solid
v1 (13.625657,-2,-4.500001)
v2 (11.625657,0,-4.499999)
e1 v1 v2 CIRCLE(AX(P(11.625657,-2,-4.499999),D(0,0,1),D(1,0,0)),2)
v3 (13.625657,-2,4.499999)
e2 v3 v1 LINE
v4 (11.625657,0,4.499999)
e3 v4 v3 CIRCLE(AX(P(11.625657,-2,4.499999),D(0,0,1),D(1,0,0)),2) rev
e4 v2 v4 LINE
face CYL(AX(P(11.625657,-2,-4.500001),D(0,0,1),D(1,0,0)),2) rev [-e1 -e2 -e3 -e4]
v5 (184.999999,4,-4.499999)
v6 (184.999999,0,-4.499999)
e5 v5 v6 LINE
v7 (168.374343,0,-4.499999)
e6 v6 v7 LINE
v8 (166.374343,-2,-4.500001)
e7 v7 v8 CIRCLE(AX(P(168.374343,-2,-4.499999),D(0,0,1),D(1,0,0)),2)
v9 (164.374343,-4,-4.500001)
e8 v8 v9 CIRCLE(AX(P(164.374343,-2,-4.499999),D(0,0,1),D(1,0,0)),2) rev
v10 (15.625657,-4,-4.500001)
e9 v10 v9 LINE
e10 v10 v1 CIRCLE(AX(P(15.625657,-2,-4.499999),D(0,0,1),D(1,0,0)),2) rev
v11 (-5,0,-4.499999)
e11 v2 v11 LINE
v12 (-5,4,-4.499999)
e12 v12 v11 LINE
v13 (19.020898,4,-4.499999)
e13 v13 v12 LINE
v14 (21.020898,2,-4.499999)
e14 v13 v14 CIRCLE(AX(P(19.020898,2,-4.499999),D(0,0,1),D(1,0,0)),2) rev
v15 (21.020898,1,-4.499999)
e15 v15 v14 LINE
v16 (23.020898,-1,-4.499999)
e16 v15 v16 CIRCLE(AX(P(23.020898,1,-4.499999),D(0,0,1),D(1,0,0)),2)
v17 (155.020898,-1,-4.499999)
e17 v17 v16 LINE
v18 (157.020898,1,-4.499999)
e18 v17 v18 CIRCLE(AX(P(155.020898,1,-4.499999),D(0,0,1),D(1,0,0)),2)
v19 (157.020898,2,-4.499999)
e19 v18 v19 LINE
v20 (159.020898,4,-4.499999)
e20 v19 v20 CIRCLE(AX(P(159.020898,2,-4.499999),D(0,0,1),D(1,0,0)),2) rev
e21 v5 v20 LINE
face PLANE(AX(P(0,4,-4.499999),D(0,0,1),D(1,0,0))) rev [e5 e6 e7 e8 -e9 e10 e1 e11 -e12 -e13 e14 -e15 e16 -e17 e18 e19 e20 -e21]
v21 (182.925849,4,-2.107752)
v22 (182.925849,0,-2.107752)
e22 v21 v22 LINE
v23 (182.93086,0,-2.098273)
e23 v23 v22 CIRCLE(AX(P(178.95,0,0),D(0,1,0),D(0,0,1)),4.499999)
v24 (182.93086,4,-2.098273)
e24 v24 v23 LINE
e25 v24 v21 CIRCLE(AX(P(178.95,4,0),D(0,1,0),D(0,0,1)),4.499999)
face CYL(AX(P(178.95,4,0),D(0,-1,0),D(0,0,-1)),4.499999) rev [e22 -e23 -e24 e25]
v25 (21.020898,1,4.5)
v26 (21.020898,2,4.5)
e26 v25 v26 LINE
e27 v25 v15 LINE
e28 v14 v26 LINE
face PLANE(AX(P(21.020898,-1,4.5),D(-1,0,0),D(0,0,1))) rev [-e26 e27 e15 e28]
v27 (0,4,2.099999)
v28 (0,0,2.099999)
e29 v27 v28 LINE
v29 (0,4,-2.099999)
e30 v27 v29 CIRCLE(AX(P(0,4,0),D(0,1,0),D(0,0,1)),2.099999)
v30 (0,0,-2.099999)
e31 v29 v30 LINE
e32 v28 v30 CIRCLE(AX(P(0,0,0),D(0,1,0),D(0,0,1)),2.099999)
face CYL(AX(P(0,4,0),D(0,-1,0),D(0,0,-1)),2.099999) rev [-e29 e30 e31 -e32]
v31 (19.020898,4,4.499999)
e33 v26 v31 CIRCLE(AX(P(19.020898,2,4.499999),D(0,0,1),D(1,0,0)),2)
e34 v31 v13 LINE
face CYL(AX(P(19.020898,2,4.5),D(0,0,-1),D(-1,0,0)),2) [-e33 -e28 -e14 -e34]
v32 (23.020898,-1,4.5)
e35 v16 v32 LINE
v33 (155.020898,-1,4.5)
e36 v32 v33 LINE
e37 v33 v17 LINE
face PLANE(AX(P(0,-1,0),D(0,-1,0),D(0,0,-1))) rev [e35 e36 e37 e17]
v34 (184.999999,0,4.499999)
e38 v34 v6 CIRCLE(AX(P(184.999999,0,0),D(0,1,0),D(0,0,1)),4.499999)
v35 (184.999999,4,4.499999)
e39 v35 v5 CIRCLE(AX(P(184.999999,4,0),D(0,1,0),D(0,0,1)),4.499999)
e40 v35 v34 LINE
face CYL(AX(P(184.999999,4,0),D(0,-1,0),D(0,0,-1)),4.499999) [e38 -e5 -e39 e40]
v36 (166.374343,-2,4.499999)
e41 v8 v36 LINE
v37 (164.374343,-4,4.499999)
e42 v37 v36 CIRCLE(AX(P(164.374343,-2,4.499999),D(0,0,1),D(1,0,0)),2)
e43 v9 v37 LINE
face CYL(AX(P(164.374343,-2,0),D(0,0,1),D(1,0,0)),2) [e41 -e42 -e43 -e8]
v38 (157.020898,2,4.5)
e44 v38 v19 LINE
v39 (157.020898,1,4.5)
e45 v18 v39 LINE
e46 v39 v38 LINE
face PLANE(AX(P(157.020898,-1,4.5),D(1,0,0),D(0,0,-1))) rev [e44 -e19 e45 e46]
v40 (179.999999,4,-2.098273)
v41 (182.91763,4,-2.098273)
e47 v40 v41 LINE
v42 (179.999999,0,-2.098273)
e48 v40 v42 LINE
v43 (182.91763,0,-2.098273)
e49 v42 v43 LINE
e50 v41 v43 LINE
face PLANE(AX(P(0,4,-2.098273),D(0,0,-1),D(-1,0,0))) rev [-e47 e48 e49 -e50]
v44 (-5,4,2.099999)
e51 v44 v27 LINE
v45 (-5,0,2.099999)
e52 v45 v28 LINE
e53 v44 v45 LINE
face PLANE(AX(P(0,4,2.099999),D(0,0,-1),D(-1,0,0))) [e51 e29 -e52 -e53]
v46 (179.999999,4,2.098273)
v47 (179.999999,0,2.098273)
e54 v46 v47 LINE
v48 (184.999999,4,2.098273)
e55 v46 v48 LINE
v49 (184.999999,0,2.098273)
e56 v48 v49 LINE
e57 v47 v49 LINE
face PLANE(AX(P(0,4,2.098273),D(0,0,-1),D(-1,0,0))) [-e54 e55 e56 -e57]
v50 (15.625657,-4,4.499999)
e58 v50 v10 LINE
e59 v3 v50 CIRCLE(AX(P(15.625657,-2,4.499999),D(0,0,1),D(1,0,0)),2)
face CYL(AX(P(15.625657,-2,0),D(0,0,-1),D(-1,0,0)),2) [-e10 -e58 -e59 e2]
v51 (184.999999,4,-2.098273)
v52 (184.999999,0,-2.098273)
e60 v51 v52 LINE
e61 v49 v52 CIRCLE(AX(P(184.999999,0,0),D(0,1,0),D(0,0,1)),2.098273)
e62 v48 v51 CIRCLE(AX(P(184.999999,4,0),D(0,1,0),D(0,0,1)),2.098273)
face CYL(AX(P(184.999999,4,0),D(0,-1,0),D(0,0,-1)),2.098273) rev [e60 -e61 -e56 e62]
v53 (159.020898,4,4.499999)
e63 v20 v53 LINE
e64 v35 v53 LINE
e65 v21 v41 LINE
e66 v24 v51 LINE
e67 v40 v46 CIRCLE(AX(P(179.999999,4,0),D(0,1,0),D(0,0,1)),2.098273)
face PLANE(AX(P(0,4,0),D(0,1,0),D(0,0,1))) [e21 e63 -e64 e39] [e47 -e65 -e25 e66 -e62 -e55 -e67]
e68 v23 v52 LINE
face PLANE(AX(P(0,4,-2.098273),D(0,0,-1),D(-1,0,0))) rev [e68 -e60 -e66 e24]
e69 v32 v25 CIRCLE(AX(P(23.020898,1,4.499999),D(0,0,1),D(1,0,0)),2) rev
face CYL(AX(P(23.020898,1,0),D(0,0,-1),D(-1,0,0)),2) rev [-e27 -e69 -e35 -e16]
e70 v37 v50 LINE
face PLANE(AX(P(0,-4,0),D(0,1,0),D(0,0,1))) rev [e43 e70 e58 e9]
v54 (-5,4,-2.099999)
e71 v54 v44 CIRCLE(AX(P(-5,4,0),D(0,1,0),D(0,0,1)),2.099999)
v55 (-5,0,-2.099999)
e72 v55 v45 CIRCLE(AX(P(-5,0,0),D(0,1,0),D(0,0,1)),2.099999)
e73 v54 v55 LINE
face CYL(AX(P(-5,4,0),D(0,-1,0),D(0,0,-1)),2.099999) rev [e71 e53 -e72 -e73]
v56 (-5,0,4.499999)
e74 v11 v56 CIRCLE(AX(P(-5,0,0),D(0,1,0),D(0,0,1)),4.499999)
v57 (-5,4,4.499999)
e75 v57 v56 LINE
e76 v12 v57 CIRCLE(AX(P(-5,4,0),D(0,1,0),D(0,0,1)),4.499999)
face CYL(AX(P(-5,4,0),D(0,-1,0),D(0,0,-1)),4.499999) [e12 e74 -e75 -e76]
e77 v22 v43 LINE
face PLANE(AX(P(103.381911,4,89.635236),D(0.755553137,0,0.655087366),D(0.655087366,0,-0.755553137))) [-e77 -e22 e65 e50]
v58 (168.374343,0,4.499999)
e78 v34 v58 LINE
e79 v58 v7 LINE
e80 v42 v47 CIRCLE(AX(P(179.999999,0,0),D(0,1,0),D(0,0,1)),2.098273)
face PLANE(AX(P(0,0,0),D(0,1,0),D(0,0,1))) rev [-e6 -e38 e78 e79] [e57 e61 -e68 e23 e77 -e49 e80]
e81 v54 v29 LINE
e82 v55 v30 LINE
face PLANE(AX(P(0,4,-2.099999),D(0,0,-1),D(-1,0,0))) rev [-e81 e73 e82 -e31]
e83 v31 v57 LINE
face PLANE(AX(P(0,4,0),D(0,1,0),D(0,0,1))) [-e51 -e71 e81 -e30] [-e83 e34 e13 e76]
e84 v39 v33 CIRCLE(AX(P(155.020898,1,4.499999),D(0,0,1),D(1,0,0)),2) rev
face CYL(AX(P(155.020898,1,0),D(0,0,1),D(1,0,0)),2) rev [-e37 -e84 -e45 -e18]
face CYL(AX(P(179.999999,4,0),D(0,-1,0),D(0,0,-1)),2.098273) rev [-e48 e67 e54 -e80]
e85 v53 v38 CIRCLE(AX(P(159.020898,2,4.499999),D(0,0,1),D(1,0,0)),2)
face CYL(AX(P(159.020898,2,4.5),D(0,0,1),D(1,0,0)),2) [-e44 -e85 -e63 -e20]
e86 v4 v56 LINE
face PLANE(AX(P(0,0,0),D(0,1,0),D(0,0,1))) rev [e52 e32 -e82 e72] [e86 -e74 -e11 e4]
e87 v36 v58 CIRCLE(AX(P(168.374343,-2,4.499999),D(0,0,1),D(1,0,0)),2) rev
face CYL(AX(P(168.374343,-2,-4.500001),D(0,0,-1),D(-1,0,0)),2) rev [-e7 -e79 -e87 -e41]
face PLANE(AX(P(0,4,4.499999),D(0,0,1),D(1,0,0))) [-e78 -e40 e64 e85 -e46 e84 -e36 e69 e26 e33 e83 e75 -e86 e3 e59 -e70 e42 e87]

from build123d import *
from OCP.BRepAlgoAPI import BRepAlgoAPI_Cut
from OCP.TopTools import TopTools_ListOfShape

# Parameters (mm, degrees)
BOSS_EXTRUDE1_DEPTH = 4
SKETCH2_W           = 152.748685894
SKETCH2_H           = 9
BOSS_EXTRUDE2_DEPTH = 4
SKETCH4_W           = 136
SKETCH4_H           = 8.999998789
CUT_EXTRUDE1_DEPTH  = 5
FILLET1_R           = 2


with BuildPart() as part:
    # Sketch1 → Boss-Extrude1 (new body)
    with BuildSketch(Plane(origin=(0, 0, 0), x_dir=(1, 0, 0), z_dir=(0, 1, 0))):
        with BuildLine():
            Line((177.196729435, 4.499999466), (2.799999668, 4.499999466))
            Line((2.799999668, 4.499999466), (-5, 4.499999466))
            ThreePointArc((-5, 4.499999466), (-9.499999466, 0), (-5, -4.499999466))
            Line((-5, -4.499999466), (2.799999668, -4.499999466))
            Line((2.799999668, -4.499999466), (177.196729435, -4.499999466))
            Line((177.196729435, -4.499999466), (184.999999457, -4.499999466))
            ThreePointArc((184.999999457, -4.499999466), (189.499998923, 0), (184.999999457, 4.499999466))
            Line((184.999999457, 4.499999466), (177.196729435, 4.499999466))
        make_face()
        with BuildLine():
            ThreePointArc((-5, -2.099999371), (-7.099999371, 0), (-5, 2.099999371))
            Line((-5, 2.099999371), (0, 2.099999371))
            ThreePointArc((0, 2.099999371), (2.099999371, 0), (0, -2.099999371))
            Line((0, -2.099999371), (-5, -2.099999371))
        make_face(mode=Mode.SUBTRACT)
        with BuildLine():
            ThreePointArc((179.999998561, -2.09827259), (177.90172597, 0), (179.999998561, 2.09827259))
            Line((179.999998561, 2.09827259), (182.917630381, 2.09827259))
            Line((182.917630381, 2.09827259), (182.925849231, 2.107751903))
            ThreePointArc((182.925849231, 2.107751903), (182.928357501, 2.103013739), (182.930860124, 2.09827259))
            Line((182.930860124, 2.09827259), (184.999999457, 2.09827259))
            ThreePointArc((184.999999457, 2.09827259), (187.098272047, 0), (184.999999457, -2.09827259))
            Line((184.999999457, -2.09827259), (179.999998561, -2.09827259))
        make_face(mode=Mode.SUBTRACT)
    extrude(amount=BOSS_EXTRUDE1_DEPTH)

    # Sketch2 → Boss-Extrude2 (add)
    with BuildSketch(Plane.XZ):
        with Locations((90, -5.34e-07)):
            Rectangle(SKETCH2_W, SKETCH2_H)
    extrude(amount=BOSS_EXTRUDE2_DEPTH)


with BuildPart() as cut_extrude1_tool:
    # Sketch4 → Cut-Extrude1 (new body)
    with BuildSketch(Plane(origin=(0, 4, 0), x_dir=(1, 0, 0), z_dir=(0, 1, 0))):
        with Locations((89.020897584, -6.05e-07)):
            Rectangle(SKETCH4_W, SKETCH4_H)
    extrude(amount=-CUT_EXTRUDE1_DEPTH)


with BuildPart() as part_1:
    add(part.part)

    # Cut-Extrude1: cut by cut_extrude1_tool, with a tolerance
    cut_extrude1_stock = TopTools_ListOfShape()
    cut_extrude1_stock.Append(part_1.part.wrapped)
    cut_extrude1_tools = TopTools_ListOfShape()
    cut_extrude1_tools.Append(cut_extrude1_tool.part.wrapped)
    cut_extrude1_cut = BRepAlgoAPI_Cut()
    cut_extrude1_cut.SetArguments(cut_extrude1_stock)
    cut_extrude1_cut.SetTools(cut_extrude1_tools)
    cut_extrude1_cut.SetFuzzyValue(0.00001)
    cut_extrude1_cut.Build()
    add(Compound.cast(cut_extrude1_cut.Shape()).solids(), mode=Mode.REPLACE)

    # Fillet1
    # the kernel refuses this fillet: 2 mm, written as the material it adds along each edge
    with BuildSketch(Plane(origin=(157.020897584, -1, 9.5), x_dir=(0, 1, 0), z_dir=(0, 0, -1))) as fillet1_piece_1_section:
        with BuildLine():
            CenterArc((FILLET1_R, -FILLET1_R), FILLET1_R, 90, 90)
            Line((0, -FILLET1_R), (0, 0))
            Line((0, 0), (FILLET1_R, 0))
        make_face()
    fillet1_piece_1 = extrude(amount=18.999998789, mode=Mode.PRIVATE)
    fillet1_piece_1 = split(fillet1_piece_1, bisect_by=Plane(origin=(157.020897584, -1, 4.499999466), z_dir=(0, 0, -1)), keep=Keep.TOP, mode=Mode.PRIVATE)
    fillet1_piece_1 = split(fillet1_piece_1, bisect_by=Plane(origin=(157.020897584, -1, -4.500000534), z_dir=(0, 0, 1)), keep=Keep.TOP, mode=Mode.PRIVATE)
    add(fillet1_piece_1)
    with BuildSketch(Plane(origin=(21.020897584, -1, -9.499998789), x_dir=(1, 0, 0), z_dir=(0, 0, 1))) as fillet1_piece_2_section:
        with BuildLine():
            CenterArc((FILLET1_R, FILLET1_R), FILLET1_R, 180, 90)
            Line((0, FILLET1_R), (0, 0))
            Line((0, 0), (FILLET1_R, 0))
        make_face()
    fillet1_piece_2 = extrude(amount=18.999998789, mode=Mode.PRIVATE)
    fillet1_piece_2 = split(fillet1_piece_2, bisect_by=Plane(origin=(21.020897584, -1, 4.499999466), z_dir=(0, 0, -1)), keep=Keep.TOP, mode=Mode.PRIVATE)
    fillet1_piece_2 = split(fillet1_piece_2, bisect_by=Plane(origin=(21.020897584, -1, -4.500000534), z_dir=(0, 0, 1)), keep=Keep.TOP, mode=Mode.PRIVATE)
    add(fillet1_piece_2)
    with BuildSketch(Plane(origin=(13.625657053, 0, 4.499999466), x_dir=(-1, 0, 0), z_dir=(0, 0, -1))) as fillet1_piece_3_section:
        with BuildLine():
            CenterArc((FILLET1_R, -FILLET1_R), FILLET1_R, 90, 90)
            Line((0, -FILLET1_R), (0, 0))
            Line((0, 0), (FILLET1_R, 0))
        make_face()
    fillet1_piece_3 = extrude(amount=13.999998931, mode=Mode.PRIVATE)
    fillet1_piece_3 = split(fillet1_piece_3, bisect_by=Plane(origin=(13.625657053, 0, -4.500000534), z_dir=(0, 0, 1)), keep=Keep.TOP, mode=Mode.PRIVATE)
    add(fillet1_piece_3)
    with BuildSketch(Plane(origin=(166.374342947, 0, -9.499999466), x_dir=(1, 0, 0), z_dir=(0, 0, 1))) as fillet1_piece_4_section:
        with BuildLine():
            CenterArc((FILLET1_R, -FILLET1_R), FILLET1_R, 90, 90)
            Line((0, -FILLET1_R), (0, 0))
            Line((0, 0), (FILLET1_R, 0))
        make_face()
    fillet1_piece_4 = extrude(amount=13.999998931, mode=Mode.PRIVATE)
    fillet1_piece_4 = split(fillet1_piece_4, bisect_by=Plane(origin=(166.374342947, 0, -4.500000534), z_dir=(0, 0, 1)), keep=Keep.TOP, mode=Mode.PRIVATE)
    add(fillet1_piece_4)
    # the kernel refuses this fillet: 2 mm, written as the material it takes off along each edge
    with BuildSketch(Plane(origin=(13.625657053, -4, 9.499999466), x_dir=(0, 1, 0), z_dir=(0, 0, -1))) as fillet1_2_piece_1:
        with BuildLine():
            CenterArc((FILLET1_R, FILLET1_R), FILLET1_R, 180, 90)
            Line((0, FILLET1_R), (0, 0))
            Line((0, 0), (FILLET1_R, 0))
        make_face()
    extrude(amount=19, mode=Mode.SUBTRACT)
    with BuildSketch(Plane(origin=(166.374342947, -4, -9.500000534), x_dir=(-1, 0, 0), z_dir=(0, 0, 1))) as fillet1_2_piece_2:
        with BuildLine():
            CenterArc((FILLET1_R, -FILLET1_R), FILLET1_R, 90, 90)
            Line((0, -FILLET1_R), (0, 0))
            Line((0, 0), (FILLET1_R, 0))
        make_face()
    extrude(amount=19, mode=Mode.SUBTRACT)
    with BuildSketch(Plane(origin=(21.020897584, 4, -9.499998789), x_dir=(0, -1, 0), z_dir=(0, 0, 1)), Plane(origin=(157.020897584, 4, 9.5), x_dir=(0, -1, 0), z_dir=(0, 0, -1))) as fillet1_2_piece_3:
        with BuildLine():
            CenterArc((FILLET1_R, -FILLET1_R), FILLET1_R, 90, 90)
            Line((0, -FILLET1_R), (0, 0))
            Line((0, 0), (FILLET1_R, 0))
        make_face()
    extrude(amount=18.999998789, mode=Mode.SUBTRACT)


solid = part_1.part
